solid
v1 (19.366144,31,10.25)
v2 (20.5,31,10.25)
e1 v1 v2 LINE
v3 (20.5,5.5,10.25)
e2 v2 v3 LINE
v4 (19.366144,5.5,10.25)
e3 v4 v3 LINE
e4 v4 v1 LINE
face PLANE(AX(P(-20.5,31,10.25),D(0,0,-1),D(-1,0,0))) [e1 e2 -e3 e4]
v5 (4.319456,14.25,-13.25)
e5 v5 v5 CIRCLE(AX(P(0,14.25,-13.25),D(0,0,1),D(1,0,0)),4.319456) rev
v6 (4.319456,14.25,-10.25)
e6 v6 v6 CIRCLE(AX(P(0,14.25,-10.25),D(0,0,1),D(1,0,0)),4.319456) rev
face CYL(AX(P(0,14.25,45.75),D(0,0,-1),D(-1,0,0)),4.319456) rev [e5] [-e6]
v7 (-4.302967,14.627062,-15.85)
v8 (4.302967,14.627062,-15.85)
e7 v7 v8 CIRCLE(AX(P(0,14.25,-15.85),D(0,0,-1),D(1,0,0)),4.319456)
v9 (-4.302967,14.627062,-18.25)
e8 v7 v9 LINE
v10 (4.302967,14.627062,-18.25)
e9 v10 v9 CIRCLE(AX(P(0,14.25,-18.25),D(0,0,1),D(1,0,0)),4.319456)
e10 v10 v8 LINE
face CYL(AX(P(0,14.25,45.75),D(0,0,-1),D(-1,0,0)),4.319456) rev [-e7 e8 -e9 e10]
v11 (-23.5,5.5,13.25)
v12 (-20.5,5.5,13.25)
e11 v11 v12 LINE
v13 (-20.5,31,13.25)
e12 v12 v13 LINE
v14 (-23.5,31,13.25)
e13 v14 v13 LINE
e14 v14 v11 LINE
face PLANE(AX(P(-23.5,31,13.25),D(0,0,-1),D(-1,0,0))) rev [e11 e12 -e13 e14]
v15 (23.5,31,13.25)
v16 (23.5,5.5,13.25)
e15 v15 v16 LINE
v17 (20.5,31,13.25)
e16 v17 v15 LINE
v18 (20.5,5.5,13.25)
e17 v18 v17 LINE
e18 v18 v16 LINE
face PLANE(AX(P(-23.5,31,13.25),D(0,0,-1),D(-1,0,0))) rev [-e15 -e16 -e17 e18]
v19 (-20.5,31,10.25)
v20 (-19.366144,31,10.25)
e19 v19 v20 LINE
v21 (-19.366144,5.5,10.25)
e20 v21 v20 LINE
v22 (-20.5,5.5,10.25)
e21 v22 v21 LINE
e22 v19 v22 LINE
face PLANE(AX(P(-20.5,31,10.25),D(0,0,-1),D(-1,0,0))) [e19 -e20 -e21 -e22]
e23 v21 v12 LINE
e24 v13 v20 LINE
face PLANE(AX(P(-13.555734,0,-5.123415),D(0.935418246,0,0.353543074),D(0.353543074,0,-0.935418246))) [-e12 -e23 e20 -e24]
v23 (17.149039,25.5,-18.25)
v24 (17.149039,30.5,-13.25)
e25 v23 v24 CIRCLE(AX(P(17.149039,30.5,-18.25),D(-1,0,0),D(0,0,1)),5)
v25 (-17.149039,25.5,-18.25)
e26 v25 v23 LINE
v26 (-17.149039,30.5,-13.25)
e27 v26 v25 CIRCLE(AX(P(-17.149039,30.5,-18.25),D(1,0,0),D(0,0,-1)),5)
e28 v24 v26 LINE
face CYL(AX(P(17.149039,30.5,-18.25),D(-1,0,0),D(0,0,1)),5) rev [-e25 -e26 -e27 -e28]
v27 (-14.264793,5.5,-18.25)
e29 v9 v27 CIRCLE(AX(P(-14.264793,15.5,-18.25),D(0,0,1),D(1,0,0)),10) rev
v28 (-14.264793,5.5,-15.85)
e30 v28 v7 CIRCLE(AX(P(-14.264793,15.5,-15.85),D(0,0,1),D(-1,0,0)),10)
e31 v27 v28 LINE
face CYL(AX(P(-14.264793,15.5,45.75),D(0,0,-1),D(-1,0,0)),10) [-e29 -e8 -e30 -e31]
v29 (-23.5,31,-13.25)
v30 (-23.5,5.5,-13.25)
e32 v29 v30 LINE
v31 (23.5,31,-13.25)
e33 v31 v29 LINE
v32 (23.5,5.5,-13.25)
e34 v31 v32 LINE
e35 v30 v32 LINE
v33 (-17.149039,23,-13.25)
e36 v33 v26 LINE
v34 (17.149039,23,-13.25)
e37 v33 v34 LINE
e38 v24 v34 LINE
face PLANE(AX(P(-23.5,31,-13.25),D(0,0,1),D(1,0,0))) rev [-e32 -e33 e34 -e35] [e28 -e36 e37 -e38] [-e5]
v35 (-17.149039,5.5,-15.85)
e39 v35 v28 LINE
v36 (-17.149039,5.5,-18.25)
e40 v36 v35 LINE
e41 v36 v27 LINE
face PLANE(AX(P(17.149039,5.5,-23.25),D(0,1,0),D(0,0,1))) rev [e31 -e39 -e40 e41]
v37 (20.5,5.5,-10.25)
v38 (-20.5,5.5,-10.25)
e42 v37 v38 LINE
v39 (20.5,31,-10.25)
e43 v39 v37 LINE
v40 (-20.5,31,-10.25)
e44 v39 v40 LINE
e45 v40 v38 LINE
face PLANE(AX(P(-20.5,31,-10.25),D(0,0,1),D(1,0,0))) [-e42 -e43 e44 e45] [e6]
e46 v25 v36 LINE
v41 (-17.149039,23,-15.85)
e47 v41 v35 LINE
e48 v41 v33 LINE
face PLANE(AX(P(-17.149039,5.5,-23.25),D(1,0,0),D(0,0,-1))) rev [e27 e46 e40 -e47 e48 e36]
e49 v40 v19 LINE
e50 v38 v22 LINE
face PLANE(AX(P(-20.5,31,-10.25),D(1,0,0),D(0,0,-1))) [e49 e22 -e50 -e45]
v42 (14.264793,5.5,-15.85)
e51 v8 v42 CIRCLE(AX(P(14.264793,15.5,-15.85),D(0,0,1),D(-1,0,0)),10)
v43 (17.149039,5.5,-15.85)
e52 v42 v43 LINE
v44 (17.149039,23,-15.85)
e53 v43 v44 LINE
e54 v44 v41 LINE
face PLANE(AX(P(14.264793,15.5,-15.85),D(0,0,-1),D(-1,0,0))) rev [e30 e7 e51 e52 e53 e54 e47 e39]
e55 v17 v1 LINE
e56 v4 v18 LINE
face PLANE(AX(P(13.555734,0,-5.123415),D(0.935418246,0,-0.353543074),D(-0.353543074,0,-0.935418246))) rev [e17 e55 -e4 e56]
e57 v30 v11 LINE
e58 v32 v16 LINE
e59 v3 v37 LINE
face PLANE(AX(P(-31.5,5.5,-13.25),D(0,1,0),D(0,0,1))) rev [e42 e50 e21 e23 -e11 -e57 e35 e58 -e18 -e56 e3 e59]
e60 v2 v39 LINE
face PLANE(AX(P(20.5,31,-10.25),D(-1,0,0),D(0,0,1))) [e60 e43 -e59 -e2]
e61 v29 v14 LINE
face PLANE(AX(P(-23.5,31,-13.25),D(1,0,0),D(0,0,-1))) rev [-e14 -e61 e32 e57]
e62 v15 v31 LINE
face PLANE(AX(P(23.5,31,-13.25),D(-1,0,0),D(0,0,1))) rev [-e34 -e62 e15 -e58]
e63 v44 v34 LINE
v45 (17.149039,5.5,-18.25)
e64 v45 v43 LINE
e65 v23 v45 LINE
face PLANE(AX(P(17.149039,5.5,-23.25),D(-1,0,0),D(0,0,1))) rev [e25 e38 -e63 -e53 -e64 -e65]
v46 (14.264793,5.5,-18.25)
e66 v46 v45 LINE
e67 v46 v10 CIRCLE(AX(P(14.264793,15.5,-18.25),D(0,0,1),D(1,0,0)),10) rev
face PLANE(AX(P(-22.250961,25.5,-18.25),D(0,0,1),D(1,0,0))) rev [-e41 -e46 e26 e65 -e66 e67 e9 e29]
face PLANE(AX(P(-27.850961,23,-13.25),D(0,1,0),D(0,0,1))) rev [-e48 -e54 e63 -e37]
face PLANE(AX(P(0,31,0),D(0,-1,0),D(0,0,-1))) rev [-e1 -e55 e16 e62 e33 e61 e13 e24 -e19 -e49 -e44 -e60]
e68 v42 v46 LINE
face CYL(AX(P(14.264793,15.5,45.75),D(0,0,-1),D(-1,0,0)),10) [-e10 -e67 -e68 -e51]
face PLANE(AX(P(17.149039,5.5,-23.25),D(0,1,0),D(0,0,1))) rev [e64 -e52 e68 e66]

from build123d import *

# Parameters (mm, degrees)
SKETCH1_W               = 47
SKETCH1_H               = 26.5
SKETCH1_W_2             = 41
SKETCH1_H_2             = 20.5
BOSS_EXTRUDE1_DEPTH     = 31
CUT_EXTRUDE2_DEPTH      = 31
SKETCH4_W               = 34.29807853
SKETCH4_H               = 20
BOSS_EXTRUDE2_DEPTH     = 10
SKETCH5_W               = 5
SKETCH5_H               = 17.5
CUT_EXTRUDE3_DEPTH      = 45
CUT_EXTRUDE4_DEPTH      = 64
CUT_EXTRUDE4_DEPTH_BACK = 45
SKETCH6_R               = 4.31945574
SKETCH7_W               = 8.63891148
SKETCH7_H               = 8.75
CUT_EXTRUDE5_DEPTH      = 10
FILLET2_START           = -23.25
FILLET2_DEPTH           = 5
SKETCH8_W               = 26.5
SKETCH8_H               = 5.5
CUT_EXTRUDE6_DEPTH      = 55
BOSS_EXTRUDE3_DEPTH     = 2.4
SKETCH10_W              = 5
SKETCH10_H              = 20
CUT_EXTRUDE7_DEPTH      = 39.4
FILLET4_R               = 5


with BuildPart() as part:
    # Sketch1 → Boss-Extrude1 (new body)
    with BuildSketch(Plane(origin=(0, 0, 0), x_dir=(1, 0, 0), z_dir=(0, 1, 0))):
        Rectangle(SKETCH1_W, SKETCH1_H)
        Rectangle(SKETCH1_W_2, SKETCH1_H_2, mode=Mode.SUBTRACT)
    extrude(amount=BOSS_EXTRUDE1_DEPTH)

    # Sketch3 → Cut-Extrude2 (cut)
    with BuildSketch(Plane(origin=(0, 31, 0), x_dir=(1, 0, 0), z_dir=(0, 1, 0))):
        Polygon((-19.366144394, -10.25), (-20.5, -13.25), (0, -13.25), (0, -10.25), align=None)
        Polygon((0, -10.25), (0, -13.25), (20.5, -13.25), (19.366144394, -10.25), align=None)
    extrude(amount=-CUT_EXTRUDE2_DEPTH, mode=Mode.SUBTRACT)

    # Sketch4 → Boss-Extrude2 (add)
    with BuildSketch(Plane(origin=(0, 0, -13.25), x_dir=(-1, 0, 0), z_dir=(0, 0, -1))):
        with Locations((0, 15.5)):
            Rectangle(SKETCH4_W, SKETCH4_H)
    extrude(amount=BOSS_EXTRUDE2_DEPTH)

    # Sketch5 → Cut-Extrude3 (cut)
    with BuildSketch(Plane(origin=(17.149039265, 0, 0), x_dir=(0, 0, -1), z_dir=(1, 0, 0))):
        with Locations((15.75, 14.25)):
            Rectangle(SKETCH5_W, SKETCH5_H)
    extrude(amount=-CUT_EXTRUDE3_DEPTH, mode=Mode.SUBTRACT)

    # Sketch6 → Cut-Extrude4 (cut, two sides: drawn at the far end of the back side and taken through both)
    with BuildSketch(Plane.XY.offset(-18.25).offset(-CUT_EXTRUDE4_DEPTH_BACK)):
        with Locations(Location((0, 14.25, 0), (0, 0, 180))):
            Circle(SKETCH6_R)
    extrude(amount=CUT_EXTRUDE4_DEPTH + CUT_EXTRUDE4_DEPTH_BACK, mode=Mode.SUBTRACT)

    # Sketch7 → Cut-Extrude5 (cut)
    with BuildSketch(Plane(origin=(0, 0, -23.25), x_dir=(-1, 0, 0), z_dir=(0, 0, -1))):
        with Locations((0, 9.875)):
            Rectangle(SKETCH7_W, SKETCH7_H)
    extrude(amount=-CUT_EXTRUDE5_DEPTH, mode=Mode.SUBTRACT)

    # Fillet2: read off the stored shape, not the designer's step
    # Fillet2 outline → Fillet2 (cut)
    with BuildSketch(Plane.XY.offset(FILLET2_START)):
        with BuildLine():
            ThreePointArc((-4.31945574, 14.25), (-4.315331507, 14.438711079), (-4.302966685, 14.627061794))
            ThreePointArc((-4.302966685, 14.627061794), (-7.509401663, 8.126758445), (-14.264792768, 5.5))
            Line((-14.264792768, 5.5), (-4.31945574, 5.5))
            Line((-4.31945574, 5.5), (-4.31945574, 14.25))
        make_face()
        with BuildLine():
            ThreePointArc((14.264792768, 5.5), (7.509401663, 8.126758445), (4.302966685, 14.627061794))
            ThreePointArc((4.302966685, 14.627061794), (4.315331507, 14.438711079), (4.31945574, 14.25))
            Line((4.31945574, 14.25), (4.31945574, 5.5))
            Line((4.31945574, 5.5), (14.264792768, 5.5))
        make_face()
    extrude(amount=FILLET2_DEPTH, mode=Mode.SUBTRACT)

    # Sketch8 → Cut-Extrude6 (cut)
    with BuildSketch(Plane(origin=(23.5, 0, 0), x_dir=(0, 0, -1), z_dir=(1, 0, 0))):
        with Locations((0, 2.75)):
            Rectangle(SKETCH8_W, SKETCH8_H)
    extrude(amount=-CUT_EXTRUDE6_DEPTH, mode=Mode.SUBTRACT)

    # Sketch9 → Boss-Extrude3 (add)
    with BuildSketch(Plane.XY.offset(-18.25)):
        with BuildLine():
            Line((-17.149039265, 23), (17.149039265, 23))
            Line((17.149039265, 23), (17.149039265, 5.5))
            Line((17.149039265, 5.5), (14.264792768, 5.5))
            ThreePointArc((14.264792768, 5.5), (7.509401663, 8.126758445), (4.302966685, 14.627061794))
            ThreePointArc((4.302966685, 14.627061794), (0, 18.56945574), (-4.302966685, 14.627061794))
            ThreePointArc((-4.302966685, 14.627061794), (-7.509401663, 8.126758445), (-14.264792768, 5.5))
            Line((-14.264792768, 5.5), (-17.149039265, 5.5))
            Line((-17.149039265, 5.5), (-17.149039265, 23))
        make_face()
    extrude(amount=BOSS_EXTRUDE3_DEPTH)

    # Sketch10 → Cut-Extrude7 (cut)
    with BuildSketch(Plane(origin=(17.149039265, 0, 0), x_dir=(0, 0, -1), z_dir=(1, 0, 0))):
        with Locations((20.75, 15.5)):
            Rectangle(SKETCH10_W, SKETCH10_H)
    extrude(amount=-CUT_EXTRUDE7_DEPTH, mode=Mode.SUBTRACT)

    # Fillet4
    fillet4_edges = [part.edges().sort_by_distance(p)[0] for p in [
        (0, 25.5, -13.25),
    ]]
    fillet(fillet4_edges, radius=FILLET4_R - 0.0001)  # a hair under: the kernel refuses the full size


solid = part.part
